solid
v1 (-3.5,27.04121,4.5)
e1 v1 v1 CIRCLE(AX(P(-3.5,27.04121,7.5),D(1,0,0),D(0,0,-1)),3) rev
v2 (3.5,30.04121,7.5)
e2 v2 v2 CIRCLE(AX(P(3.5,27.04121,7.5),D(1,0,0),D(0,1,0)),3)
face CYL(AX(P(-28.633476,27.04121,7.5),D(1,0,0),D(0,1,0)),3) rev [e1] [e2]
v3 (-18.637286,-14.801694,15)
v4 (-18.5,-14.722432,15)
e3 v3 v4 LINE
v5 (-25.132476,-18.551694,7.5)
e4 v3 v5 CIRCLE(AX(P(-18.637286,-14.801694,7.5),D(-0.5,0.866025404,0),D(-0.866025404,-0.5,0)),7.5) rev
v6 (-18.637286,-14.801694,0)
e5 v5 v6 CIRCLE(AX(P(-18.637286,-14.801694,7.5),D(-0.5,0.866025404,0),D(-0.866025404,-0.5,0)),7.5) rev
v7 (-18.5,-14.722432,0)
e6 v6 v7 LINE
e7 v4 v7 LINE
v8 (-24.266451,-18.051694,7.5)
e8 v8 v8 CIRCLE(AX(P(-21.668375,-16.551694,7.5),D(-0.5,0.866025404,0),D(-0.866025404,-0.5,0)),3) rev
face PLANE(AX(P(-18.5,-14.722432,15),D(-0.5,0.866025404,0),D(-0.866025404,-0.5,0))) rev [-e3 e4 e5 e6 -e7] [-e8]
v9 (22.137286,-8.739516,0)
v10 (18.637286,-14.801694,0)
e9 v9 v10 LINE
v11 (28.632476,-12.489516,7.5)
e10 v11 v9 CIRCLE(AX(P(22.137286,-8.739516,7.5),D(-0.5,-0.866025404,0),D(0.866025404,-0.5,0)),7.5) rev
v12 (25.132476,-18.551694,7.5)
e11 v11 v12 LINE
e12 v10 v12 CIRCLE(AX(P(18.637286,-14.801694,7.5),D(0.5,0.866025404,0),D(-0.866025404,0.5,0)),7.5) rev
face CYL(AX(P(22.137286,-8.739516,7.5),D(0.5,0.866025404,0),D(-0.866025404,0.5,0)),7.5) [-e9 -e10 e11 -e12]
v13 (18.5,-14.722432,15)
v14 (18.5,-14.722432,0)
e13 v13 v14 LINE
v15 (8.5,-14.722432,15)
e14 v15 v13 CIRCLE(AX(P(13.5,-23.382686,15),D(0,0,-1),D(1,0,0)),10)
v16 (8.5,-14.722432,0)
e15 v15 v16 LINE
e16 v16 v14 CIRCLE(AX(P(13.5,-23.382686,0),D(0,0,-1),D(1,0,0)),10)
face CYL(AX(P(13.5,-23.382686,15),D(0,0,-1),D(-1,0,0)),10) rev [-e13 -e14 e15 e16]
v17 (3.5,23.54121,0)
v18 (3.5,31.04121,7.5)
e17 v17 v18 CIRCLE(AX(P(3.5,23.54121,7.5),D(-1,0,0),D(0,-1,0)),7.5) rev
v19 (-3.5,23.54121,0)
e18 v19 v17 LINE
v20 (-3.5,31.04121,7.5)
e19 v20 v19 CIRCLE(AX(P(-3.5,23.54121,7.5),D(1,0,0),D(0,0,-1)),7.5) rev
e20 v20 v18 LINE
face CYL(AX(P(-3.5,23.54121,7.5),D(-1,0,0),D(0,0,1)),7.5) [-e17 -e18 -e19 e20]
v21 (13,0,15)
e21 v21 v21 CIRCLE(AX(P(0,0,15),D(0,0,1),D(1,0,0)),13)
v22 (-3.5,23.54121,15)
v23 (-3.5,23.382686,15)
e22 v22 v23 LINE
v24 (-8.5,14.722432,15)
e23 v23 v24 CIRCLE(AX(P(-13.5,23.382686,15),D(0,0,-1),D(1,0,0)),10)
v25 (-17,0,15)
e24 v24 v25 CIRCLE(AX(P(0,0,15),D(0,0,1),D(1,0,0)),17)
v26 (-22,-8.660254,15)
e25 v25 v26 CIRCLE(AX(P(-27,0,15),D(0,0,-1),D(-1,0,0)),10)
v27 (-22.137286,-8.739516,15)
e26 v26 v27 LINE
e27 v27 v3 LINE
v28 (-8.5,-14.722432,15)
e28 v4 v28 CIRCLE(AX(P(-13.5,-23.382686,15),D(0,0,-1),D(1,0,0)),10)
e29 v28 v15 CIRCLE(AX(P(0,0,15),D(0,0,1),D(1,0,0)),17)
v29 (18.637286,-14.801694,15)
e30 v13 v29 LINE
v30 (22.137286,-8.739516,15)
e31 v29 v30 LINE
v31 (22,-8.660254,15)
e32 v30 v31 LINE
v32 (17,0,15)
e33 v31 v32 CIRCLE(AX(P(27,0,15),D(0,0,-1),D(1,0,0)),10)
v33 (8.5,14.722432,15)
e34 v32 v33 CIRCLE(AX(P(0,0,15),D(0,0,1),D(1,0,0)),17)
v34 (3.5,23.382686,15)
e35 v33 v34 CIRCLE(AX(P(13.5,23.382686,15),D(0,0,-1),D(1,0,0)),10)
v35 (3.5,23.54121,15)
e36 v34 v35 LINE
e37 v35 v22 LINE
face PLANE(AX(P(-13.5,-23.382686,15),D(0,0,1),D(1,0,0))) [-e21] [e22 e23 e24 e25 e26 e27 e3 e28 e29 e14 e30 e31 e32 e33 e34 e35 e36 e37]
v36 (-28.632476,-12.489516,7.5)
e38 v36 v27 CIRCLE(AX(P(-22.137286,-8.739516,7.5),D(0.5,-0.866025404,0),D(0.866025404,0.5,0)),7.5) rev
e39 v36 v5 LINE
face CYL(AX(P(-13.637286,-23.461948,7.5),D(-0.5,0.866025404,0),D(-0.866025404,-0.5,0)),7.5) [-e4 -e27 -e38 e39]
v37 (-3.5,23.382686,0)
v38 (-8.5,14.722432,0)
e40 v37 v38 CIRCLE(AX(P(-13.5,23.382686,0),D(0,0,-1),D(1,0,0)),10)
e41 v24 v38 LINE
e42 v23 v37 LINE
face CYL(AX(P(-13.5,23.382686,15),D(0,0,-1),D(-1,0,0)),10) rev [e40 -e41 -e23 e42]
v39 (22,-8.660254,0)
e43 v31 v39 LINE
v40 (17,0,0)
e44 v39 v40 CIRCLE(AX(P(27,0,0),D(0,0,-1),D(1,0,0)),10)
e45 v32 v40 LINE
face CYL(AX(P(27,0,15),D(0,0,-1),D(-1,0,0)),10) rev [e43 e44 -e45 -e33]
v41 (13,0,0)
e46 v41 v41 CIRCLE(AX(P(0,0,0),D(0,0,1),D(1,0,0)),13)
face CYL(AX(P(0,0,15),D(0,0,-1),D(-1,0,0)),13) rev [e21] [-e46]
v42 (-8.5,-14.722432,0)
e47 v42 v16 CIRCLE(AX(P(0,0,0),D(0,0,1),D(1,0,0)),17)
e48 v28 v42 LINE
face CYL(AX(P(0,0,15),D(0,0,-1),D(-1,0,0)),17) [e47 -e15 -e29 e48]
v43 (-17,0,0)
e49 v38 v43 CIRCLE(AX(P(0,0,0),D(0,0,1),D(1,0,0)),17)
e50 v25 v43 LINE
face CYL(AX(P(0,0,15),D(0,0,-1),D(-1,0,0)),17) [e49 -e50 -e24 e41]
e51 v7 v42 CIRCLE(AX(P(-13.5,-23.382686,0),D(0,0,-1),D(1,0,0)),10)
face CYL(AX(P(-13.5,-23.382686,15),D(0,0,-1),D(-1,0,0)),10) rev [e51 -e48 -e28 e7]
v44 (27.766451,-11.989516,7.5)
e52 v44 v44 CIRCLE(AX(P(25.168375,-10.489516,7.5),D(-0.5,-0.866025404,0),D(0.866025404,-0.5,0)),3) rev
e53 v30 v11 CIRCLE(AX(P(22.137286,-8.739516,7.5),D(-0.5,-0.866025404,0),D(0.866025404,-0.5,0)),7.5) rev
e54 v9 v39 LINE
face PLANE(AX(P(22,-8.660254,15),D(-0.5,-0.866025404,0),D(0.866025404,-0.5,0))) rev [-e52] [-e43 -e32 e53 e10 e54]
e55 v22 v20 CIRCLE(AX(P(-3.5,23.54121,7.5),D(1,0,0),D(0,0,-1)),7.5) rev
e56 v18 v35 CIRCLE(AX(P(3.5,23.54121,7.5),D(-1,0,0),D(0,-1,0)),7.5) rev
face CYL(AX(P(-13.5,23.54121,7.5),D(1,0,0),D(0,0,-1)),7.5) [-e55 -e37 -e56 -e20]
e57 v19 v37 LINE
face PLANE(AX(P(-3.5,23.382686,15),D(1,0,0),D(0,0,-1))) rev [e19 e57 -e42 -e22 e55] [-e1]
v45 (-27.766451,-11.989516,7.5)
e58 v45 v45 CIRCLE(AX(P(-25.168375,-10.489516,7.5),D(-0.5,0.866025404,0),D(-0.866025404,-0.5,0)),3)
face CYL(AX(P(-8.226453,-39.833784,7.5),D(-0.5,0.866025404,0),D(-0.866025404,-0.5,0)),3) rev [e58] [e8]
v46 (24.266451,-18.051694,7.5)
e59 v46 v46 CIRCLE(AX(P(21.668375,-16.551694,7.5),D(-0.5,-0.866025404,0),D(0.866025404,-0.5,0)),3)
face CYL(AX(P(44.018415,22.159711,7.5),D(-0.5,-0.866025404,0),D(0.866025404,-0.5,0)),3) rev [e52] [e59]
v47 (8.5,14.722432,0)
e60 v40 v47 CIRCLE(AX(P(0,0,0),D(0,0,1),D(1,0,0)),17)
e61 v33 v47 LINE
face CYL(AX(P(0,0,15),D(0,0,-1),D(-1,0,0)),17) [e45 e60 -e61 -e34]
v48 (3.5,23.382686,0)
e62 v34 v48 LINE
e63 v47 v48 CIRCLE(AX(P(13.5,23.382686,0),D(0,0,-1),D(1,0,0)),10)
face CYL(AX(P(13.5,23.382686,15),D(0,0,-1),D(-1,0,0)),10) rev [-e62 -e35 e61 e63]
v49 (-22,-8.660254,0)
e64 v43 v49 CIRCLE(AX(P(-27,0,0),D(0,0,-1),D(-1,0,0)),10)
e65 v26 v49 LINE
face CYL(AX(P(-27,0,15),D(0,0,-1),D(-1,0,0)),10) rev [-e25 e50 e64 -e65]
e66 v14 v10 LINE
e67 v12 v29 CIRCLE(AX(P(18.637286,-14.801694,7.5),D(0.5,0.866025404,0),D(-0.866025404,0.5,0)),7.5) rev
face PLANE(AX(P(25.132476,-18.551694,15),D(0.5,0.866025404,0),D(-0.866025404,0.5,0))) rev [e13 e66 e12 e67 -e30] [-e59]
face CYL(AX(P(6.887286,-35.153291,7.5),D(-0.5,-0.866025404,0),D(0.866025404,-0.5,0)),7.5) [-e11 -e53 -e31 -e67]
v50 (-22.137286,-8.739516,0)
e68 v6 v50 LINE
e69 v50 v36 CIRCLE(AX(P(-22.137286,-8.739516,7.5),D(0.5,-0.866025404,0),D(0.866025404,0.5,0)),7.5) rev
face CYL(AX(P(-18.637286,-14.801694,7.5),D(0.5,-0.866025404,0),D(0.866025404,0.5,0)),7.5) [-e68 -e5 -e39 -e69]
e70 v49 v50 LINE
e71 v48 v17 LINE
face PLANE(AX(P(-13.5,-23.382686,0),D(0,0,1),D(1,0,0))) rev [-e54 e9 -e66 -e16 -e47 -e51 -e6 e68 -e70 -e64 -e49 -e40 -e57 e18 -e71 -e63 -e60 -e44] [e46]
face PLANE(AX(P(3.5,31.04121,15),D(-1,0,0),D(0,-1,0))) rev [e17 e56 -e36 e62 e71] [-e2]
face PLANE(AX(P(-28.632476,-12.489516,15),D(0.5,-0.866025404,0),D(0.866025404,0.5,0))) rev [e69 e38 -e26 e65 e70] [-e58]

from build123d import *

# Parameters (mm, degrees)
ESQUISSE1_R                  = 13
BOSS_EXTRU_1_DEPTH           = 15
CONG_1_R                     = 7.5
CONG_2_R                     = 7.5
CONG_3_R                     = 7.5
ENL_V_MAT_EXTRU_1_REACH      = 50.052
ESQUISSE2_R                  = 3
R_P_TITION_CIRCULAIRE1_COUNT = 3


with BuildPart() as part:
    # Esquisse1 → Boss.-Extru.1 (new body)
    with BuildSketch(Plane.XY):
        with BuildLine():
            Line((-3.5, 23.382685902), (-3.5, 31.041209697))
            Line((-3.5, 31.041209697), (3.5, 31.041209697))
            Line((3.5, 31.041209697), (3.5, 23.382685902))
            ThreePointArc((3.5, 23.382685902), (4.839745962, 18.382685902), (8.5, 14.722431864))
            ThreePointArc((8.5, 14.722431864), (14.722431864, 8.5), (17, 0))
            ThreePointArc((17, 0), (18.339745962, -5), (22, -8.660254038))
            Line((22, -8.660254038), (28.632476161, -12.489515935))
            Line((28.632476161, -12.489515935), (25.132476161, -18.551693762))
            Line((25.132476161, -18.551693762), (18.5, -14.722431864))
            ThreePointArc((18.5, -14.722431864), (13.5, -13.382685902), (8.5, -14.722431864))
            ThreePointArc((8.5, -14.722431864), (0, -17), (-8.5, -14.722431864))
            ThreePointArc((-8.5, -14.722431864), (-13.5, -13.382685902), (-18.5, -14.722431864))
            Line((-18.5, -14.722431864), (-25.132476161, -18.551693762))
            Line((-25.132476161, -18.551693762), (-28.632476161, -12.489515935))
            Line((-28.632476161, -12.489515935), (-22, -8.660254038))
            ThreePointArc((-22, -8.660254038), (-18.339745962, -5), (-17, 0))
            ThreePointArc((-17, 0), (-14.722431864, 8.5), (-8.5, 14.722431864))
            ThreePointArc((-8.5, 14.722431864), (-4.839745962, 18.382685902), (-3.5, 23.382685902))
        make_face()
        Circle(ESQUISSE1_R, mode=Mode.SUBTRACT)
    extrude(amount=BOSS_EXTRU_1_DEPTH)

    # Congé1
    cong_1_edges = [part.edges().sort_by_distance(p)[0] for p in [
        (0, 31.041209697, 0),
        (0, 31.041209697, 15),
    ]]
    fillet(cong_1_edges, radius=CONG_1_R - 0.0001)  # a hair under: the kernel refuses the full size

    # Congé2
    cong_2_edges = [part.edges().sort_by_distance(p)[0] for p in [
        (26.882476161, -15.520604848, 0),
        (26.882476161, -15.520604848, 15),
    ]]
    fillet(cong_2_edges, radius=CONG_2_R - 0.0001)  # a hair under: the kernel refuses the full size

    # Congé3
    cong_3_edges = [part.edges().sort_by_distance(p)[0] for p in [
        (-26.882476161, -15.520604848, 15),
        (-26.882476161, -15.520604848, 0),
    ]]
    fillet(cong_3_edges, radius=CONG_3_R - 0.0001)  # a hair under: the kernel refuses the full size

    # Esquisse2 → Enlèv. mat.-Extru.1 (cut, up to next)
    with BuildSketch(Plane(origin=(-1.75, -3.031088913, 0), x_dir=(0.8660254037844389, -0.4999999999999995, 0), z_dir=(-0.4999999999999995, -0.8660254037844389, 0)), mode=Mode.PRIVATE) as enl_v_mat_extru_1_sk1:
        with Locations((27.041209697, 7.5)):
            Circle(ESQUISSE2_R)
    enl_v_mat_extru_1_tool1 = extrude(enl_v_mat_extru_1_sk1.sketch, amount=-ENL_V_MAT_EXTRU_1_REACH, mode=Mode.PRIVATE) & part.part
    enl_v_mat_extru_1 = enl_v_mat_extru_1_tool1.solids().sort_by_distance((21.668375, -16.551694, 7.5))[0]
    add(enl_v_mat_extru_1, mode=Mode.SUBTRACT)

    # Répétition circulaire1: Enlèv. mat.-Extru.1 ×3 about axis
    r_p_tition_circulaire1_axis = Axis((0, 0, 15), (0, 0, -1))
    for i in range(1, R_P_TITION_CIRCULAIRE1_COUNT):
        add(enl_v_mat_extru_1.rotate(r_p_tition_circulaire1_axis, i * 360 / R_P_TITION_CIRCULAIRE1_COUNT), mode=Mode.SUBTRACT)


solid = part.part
